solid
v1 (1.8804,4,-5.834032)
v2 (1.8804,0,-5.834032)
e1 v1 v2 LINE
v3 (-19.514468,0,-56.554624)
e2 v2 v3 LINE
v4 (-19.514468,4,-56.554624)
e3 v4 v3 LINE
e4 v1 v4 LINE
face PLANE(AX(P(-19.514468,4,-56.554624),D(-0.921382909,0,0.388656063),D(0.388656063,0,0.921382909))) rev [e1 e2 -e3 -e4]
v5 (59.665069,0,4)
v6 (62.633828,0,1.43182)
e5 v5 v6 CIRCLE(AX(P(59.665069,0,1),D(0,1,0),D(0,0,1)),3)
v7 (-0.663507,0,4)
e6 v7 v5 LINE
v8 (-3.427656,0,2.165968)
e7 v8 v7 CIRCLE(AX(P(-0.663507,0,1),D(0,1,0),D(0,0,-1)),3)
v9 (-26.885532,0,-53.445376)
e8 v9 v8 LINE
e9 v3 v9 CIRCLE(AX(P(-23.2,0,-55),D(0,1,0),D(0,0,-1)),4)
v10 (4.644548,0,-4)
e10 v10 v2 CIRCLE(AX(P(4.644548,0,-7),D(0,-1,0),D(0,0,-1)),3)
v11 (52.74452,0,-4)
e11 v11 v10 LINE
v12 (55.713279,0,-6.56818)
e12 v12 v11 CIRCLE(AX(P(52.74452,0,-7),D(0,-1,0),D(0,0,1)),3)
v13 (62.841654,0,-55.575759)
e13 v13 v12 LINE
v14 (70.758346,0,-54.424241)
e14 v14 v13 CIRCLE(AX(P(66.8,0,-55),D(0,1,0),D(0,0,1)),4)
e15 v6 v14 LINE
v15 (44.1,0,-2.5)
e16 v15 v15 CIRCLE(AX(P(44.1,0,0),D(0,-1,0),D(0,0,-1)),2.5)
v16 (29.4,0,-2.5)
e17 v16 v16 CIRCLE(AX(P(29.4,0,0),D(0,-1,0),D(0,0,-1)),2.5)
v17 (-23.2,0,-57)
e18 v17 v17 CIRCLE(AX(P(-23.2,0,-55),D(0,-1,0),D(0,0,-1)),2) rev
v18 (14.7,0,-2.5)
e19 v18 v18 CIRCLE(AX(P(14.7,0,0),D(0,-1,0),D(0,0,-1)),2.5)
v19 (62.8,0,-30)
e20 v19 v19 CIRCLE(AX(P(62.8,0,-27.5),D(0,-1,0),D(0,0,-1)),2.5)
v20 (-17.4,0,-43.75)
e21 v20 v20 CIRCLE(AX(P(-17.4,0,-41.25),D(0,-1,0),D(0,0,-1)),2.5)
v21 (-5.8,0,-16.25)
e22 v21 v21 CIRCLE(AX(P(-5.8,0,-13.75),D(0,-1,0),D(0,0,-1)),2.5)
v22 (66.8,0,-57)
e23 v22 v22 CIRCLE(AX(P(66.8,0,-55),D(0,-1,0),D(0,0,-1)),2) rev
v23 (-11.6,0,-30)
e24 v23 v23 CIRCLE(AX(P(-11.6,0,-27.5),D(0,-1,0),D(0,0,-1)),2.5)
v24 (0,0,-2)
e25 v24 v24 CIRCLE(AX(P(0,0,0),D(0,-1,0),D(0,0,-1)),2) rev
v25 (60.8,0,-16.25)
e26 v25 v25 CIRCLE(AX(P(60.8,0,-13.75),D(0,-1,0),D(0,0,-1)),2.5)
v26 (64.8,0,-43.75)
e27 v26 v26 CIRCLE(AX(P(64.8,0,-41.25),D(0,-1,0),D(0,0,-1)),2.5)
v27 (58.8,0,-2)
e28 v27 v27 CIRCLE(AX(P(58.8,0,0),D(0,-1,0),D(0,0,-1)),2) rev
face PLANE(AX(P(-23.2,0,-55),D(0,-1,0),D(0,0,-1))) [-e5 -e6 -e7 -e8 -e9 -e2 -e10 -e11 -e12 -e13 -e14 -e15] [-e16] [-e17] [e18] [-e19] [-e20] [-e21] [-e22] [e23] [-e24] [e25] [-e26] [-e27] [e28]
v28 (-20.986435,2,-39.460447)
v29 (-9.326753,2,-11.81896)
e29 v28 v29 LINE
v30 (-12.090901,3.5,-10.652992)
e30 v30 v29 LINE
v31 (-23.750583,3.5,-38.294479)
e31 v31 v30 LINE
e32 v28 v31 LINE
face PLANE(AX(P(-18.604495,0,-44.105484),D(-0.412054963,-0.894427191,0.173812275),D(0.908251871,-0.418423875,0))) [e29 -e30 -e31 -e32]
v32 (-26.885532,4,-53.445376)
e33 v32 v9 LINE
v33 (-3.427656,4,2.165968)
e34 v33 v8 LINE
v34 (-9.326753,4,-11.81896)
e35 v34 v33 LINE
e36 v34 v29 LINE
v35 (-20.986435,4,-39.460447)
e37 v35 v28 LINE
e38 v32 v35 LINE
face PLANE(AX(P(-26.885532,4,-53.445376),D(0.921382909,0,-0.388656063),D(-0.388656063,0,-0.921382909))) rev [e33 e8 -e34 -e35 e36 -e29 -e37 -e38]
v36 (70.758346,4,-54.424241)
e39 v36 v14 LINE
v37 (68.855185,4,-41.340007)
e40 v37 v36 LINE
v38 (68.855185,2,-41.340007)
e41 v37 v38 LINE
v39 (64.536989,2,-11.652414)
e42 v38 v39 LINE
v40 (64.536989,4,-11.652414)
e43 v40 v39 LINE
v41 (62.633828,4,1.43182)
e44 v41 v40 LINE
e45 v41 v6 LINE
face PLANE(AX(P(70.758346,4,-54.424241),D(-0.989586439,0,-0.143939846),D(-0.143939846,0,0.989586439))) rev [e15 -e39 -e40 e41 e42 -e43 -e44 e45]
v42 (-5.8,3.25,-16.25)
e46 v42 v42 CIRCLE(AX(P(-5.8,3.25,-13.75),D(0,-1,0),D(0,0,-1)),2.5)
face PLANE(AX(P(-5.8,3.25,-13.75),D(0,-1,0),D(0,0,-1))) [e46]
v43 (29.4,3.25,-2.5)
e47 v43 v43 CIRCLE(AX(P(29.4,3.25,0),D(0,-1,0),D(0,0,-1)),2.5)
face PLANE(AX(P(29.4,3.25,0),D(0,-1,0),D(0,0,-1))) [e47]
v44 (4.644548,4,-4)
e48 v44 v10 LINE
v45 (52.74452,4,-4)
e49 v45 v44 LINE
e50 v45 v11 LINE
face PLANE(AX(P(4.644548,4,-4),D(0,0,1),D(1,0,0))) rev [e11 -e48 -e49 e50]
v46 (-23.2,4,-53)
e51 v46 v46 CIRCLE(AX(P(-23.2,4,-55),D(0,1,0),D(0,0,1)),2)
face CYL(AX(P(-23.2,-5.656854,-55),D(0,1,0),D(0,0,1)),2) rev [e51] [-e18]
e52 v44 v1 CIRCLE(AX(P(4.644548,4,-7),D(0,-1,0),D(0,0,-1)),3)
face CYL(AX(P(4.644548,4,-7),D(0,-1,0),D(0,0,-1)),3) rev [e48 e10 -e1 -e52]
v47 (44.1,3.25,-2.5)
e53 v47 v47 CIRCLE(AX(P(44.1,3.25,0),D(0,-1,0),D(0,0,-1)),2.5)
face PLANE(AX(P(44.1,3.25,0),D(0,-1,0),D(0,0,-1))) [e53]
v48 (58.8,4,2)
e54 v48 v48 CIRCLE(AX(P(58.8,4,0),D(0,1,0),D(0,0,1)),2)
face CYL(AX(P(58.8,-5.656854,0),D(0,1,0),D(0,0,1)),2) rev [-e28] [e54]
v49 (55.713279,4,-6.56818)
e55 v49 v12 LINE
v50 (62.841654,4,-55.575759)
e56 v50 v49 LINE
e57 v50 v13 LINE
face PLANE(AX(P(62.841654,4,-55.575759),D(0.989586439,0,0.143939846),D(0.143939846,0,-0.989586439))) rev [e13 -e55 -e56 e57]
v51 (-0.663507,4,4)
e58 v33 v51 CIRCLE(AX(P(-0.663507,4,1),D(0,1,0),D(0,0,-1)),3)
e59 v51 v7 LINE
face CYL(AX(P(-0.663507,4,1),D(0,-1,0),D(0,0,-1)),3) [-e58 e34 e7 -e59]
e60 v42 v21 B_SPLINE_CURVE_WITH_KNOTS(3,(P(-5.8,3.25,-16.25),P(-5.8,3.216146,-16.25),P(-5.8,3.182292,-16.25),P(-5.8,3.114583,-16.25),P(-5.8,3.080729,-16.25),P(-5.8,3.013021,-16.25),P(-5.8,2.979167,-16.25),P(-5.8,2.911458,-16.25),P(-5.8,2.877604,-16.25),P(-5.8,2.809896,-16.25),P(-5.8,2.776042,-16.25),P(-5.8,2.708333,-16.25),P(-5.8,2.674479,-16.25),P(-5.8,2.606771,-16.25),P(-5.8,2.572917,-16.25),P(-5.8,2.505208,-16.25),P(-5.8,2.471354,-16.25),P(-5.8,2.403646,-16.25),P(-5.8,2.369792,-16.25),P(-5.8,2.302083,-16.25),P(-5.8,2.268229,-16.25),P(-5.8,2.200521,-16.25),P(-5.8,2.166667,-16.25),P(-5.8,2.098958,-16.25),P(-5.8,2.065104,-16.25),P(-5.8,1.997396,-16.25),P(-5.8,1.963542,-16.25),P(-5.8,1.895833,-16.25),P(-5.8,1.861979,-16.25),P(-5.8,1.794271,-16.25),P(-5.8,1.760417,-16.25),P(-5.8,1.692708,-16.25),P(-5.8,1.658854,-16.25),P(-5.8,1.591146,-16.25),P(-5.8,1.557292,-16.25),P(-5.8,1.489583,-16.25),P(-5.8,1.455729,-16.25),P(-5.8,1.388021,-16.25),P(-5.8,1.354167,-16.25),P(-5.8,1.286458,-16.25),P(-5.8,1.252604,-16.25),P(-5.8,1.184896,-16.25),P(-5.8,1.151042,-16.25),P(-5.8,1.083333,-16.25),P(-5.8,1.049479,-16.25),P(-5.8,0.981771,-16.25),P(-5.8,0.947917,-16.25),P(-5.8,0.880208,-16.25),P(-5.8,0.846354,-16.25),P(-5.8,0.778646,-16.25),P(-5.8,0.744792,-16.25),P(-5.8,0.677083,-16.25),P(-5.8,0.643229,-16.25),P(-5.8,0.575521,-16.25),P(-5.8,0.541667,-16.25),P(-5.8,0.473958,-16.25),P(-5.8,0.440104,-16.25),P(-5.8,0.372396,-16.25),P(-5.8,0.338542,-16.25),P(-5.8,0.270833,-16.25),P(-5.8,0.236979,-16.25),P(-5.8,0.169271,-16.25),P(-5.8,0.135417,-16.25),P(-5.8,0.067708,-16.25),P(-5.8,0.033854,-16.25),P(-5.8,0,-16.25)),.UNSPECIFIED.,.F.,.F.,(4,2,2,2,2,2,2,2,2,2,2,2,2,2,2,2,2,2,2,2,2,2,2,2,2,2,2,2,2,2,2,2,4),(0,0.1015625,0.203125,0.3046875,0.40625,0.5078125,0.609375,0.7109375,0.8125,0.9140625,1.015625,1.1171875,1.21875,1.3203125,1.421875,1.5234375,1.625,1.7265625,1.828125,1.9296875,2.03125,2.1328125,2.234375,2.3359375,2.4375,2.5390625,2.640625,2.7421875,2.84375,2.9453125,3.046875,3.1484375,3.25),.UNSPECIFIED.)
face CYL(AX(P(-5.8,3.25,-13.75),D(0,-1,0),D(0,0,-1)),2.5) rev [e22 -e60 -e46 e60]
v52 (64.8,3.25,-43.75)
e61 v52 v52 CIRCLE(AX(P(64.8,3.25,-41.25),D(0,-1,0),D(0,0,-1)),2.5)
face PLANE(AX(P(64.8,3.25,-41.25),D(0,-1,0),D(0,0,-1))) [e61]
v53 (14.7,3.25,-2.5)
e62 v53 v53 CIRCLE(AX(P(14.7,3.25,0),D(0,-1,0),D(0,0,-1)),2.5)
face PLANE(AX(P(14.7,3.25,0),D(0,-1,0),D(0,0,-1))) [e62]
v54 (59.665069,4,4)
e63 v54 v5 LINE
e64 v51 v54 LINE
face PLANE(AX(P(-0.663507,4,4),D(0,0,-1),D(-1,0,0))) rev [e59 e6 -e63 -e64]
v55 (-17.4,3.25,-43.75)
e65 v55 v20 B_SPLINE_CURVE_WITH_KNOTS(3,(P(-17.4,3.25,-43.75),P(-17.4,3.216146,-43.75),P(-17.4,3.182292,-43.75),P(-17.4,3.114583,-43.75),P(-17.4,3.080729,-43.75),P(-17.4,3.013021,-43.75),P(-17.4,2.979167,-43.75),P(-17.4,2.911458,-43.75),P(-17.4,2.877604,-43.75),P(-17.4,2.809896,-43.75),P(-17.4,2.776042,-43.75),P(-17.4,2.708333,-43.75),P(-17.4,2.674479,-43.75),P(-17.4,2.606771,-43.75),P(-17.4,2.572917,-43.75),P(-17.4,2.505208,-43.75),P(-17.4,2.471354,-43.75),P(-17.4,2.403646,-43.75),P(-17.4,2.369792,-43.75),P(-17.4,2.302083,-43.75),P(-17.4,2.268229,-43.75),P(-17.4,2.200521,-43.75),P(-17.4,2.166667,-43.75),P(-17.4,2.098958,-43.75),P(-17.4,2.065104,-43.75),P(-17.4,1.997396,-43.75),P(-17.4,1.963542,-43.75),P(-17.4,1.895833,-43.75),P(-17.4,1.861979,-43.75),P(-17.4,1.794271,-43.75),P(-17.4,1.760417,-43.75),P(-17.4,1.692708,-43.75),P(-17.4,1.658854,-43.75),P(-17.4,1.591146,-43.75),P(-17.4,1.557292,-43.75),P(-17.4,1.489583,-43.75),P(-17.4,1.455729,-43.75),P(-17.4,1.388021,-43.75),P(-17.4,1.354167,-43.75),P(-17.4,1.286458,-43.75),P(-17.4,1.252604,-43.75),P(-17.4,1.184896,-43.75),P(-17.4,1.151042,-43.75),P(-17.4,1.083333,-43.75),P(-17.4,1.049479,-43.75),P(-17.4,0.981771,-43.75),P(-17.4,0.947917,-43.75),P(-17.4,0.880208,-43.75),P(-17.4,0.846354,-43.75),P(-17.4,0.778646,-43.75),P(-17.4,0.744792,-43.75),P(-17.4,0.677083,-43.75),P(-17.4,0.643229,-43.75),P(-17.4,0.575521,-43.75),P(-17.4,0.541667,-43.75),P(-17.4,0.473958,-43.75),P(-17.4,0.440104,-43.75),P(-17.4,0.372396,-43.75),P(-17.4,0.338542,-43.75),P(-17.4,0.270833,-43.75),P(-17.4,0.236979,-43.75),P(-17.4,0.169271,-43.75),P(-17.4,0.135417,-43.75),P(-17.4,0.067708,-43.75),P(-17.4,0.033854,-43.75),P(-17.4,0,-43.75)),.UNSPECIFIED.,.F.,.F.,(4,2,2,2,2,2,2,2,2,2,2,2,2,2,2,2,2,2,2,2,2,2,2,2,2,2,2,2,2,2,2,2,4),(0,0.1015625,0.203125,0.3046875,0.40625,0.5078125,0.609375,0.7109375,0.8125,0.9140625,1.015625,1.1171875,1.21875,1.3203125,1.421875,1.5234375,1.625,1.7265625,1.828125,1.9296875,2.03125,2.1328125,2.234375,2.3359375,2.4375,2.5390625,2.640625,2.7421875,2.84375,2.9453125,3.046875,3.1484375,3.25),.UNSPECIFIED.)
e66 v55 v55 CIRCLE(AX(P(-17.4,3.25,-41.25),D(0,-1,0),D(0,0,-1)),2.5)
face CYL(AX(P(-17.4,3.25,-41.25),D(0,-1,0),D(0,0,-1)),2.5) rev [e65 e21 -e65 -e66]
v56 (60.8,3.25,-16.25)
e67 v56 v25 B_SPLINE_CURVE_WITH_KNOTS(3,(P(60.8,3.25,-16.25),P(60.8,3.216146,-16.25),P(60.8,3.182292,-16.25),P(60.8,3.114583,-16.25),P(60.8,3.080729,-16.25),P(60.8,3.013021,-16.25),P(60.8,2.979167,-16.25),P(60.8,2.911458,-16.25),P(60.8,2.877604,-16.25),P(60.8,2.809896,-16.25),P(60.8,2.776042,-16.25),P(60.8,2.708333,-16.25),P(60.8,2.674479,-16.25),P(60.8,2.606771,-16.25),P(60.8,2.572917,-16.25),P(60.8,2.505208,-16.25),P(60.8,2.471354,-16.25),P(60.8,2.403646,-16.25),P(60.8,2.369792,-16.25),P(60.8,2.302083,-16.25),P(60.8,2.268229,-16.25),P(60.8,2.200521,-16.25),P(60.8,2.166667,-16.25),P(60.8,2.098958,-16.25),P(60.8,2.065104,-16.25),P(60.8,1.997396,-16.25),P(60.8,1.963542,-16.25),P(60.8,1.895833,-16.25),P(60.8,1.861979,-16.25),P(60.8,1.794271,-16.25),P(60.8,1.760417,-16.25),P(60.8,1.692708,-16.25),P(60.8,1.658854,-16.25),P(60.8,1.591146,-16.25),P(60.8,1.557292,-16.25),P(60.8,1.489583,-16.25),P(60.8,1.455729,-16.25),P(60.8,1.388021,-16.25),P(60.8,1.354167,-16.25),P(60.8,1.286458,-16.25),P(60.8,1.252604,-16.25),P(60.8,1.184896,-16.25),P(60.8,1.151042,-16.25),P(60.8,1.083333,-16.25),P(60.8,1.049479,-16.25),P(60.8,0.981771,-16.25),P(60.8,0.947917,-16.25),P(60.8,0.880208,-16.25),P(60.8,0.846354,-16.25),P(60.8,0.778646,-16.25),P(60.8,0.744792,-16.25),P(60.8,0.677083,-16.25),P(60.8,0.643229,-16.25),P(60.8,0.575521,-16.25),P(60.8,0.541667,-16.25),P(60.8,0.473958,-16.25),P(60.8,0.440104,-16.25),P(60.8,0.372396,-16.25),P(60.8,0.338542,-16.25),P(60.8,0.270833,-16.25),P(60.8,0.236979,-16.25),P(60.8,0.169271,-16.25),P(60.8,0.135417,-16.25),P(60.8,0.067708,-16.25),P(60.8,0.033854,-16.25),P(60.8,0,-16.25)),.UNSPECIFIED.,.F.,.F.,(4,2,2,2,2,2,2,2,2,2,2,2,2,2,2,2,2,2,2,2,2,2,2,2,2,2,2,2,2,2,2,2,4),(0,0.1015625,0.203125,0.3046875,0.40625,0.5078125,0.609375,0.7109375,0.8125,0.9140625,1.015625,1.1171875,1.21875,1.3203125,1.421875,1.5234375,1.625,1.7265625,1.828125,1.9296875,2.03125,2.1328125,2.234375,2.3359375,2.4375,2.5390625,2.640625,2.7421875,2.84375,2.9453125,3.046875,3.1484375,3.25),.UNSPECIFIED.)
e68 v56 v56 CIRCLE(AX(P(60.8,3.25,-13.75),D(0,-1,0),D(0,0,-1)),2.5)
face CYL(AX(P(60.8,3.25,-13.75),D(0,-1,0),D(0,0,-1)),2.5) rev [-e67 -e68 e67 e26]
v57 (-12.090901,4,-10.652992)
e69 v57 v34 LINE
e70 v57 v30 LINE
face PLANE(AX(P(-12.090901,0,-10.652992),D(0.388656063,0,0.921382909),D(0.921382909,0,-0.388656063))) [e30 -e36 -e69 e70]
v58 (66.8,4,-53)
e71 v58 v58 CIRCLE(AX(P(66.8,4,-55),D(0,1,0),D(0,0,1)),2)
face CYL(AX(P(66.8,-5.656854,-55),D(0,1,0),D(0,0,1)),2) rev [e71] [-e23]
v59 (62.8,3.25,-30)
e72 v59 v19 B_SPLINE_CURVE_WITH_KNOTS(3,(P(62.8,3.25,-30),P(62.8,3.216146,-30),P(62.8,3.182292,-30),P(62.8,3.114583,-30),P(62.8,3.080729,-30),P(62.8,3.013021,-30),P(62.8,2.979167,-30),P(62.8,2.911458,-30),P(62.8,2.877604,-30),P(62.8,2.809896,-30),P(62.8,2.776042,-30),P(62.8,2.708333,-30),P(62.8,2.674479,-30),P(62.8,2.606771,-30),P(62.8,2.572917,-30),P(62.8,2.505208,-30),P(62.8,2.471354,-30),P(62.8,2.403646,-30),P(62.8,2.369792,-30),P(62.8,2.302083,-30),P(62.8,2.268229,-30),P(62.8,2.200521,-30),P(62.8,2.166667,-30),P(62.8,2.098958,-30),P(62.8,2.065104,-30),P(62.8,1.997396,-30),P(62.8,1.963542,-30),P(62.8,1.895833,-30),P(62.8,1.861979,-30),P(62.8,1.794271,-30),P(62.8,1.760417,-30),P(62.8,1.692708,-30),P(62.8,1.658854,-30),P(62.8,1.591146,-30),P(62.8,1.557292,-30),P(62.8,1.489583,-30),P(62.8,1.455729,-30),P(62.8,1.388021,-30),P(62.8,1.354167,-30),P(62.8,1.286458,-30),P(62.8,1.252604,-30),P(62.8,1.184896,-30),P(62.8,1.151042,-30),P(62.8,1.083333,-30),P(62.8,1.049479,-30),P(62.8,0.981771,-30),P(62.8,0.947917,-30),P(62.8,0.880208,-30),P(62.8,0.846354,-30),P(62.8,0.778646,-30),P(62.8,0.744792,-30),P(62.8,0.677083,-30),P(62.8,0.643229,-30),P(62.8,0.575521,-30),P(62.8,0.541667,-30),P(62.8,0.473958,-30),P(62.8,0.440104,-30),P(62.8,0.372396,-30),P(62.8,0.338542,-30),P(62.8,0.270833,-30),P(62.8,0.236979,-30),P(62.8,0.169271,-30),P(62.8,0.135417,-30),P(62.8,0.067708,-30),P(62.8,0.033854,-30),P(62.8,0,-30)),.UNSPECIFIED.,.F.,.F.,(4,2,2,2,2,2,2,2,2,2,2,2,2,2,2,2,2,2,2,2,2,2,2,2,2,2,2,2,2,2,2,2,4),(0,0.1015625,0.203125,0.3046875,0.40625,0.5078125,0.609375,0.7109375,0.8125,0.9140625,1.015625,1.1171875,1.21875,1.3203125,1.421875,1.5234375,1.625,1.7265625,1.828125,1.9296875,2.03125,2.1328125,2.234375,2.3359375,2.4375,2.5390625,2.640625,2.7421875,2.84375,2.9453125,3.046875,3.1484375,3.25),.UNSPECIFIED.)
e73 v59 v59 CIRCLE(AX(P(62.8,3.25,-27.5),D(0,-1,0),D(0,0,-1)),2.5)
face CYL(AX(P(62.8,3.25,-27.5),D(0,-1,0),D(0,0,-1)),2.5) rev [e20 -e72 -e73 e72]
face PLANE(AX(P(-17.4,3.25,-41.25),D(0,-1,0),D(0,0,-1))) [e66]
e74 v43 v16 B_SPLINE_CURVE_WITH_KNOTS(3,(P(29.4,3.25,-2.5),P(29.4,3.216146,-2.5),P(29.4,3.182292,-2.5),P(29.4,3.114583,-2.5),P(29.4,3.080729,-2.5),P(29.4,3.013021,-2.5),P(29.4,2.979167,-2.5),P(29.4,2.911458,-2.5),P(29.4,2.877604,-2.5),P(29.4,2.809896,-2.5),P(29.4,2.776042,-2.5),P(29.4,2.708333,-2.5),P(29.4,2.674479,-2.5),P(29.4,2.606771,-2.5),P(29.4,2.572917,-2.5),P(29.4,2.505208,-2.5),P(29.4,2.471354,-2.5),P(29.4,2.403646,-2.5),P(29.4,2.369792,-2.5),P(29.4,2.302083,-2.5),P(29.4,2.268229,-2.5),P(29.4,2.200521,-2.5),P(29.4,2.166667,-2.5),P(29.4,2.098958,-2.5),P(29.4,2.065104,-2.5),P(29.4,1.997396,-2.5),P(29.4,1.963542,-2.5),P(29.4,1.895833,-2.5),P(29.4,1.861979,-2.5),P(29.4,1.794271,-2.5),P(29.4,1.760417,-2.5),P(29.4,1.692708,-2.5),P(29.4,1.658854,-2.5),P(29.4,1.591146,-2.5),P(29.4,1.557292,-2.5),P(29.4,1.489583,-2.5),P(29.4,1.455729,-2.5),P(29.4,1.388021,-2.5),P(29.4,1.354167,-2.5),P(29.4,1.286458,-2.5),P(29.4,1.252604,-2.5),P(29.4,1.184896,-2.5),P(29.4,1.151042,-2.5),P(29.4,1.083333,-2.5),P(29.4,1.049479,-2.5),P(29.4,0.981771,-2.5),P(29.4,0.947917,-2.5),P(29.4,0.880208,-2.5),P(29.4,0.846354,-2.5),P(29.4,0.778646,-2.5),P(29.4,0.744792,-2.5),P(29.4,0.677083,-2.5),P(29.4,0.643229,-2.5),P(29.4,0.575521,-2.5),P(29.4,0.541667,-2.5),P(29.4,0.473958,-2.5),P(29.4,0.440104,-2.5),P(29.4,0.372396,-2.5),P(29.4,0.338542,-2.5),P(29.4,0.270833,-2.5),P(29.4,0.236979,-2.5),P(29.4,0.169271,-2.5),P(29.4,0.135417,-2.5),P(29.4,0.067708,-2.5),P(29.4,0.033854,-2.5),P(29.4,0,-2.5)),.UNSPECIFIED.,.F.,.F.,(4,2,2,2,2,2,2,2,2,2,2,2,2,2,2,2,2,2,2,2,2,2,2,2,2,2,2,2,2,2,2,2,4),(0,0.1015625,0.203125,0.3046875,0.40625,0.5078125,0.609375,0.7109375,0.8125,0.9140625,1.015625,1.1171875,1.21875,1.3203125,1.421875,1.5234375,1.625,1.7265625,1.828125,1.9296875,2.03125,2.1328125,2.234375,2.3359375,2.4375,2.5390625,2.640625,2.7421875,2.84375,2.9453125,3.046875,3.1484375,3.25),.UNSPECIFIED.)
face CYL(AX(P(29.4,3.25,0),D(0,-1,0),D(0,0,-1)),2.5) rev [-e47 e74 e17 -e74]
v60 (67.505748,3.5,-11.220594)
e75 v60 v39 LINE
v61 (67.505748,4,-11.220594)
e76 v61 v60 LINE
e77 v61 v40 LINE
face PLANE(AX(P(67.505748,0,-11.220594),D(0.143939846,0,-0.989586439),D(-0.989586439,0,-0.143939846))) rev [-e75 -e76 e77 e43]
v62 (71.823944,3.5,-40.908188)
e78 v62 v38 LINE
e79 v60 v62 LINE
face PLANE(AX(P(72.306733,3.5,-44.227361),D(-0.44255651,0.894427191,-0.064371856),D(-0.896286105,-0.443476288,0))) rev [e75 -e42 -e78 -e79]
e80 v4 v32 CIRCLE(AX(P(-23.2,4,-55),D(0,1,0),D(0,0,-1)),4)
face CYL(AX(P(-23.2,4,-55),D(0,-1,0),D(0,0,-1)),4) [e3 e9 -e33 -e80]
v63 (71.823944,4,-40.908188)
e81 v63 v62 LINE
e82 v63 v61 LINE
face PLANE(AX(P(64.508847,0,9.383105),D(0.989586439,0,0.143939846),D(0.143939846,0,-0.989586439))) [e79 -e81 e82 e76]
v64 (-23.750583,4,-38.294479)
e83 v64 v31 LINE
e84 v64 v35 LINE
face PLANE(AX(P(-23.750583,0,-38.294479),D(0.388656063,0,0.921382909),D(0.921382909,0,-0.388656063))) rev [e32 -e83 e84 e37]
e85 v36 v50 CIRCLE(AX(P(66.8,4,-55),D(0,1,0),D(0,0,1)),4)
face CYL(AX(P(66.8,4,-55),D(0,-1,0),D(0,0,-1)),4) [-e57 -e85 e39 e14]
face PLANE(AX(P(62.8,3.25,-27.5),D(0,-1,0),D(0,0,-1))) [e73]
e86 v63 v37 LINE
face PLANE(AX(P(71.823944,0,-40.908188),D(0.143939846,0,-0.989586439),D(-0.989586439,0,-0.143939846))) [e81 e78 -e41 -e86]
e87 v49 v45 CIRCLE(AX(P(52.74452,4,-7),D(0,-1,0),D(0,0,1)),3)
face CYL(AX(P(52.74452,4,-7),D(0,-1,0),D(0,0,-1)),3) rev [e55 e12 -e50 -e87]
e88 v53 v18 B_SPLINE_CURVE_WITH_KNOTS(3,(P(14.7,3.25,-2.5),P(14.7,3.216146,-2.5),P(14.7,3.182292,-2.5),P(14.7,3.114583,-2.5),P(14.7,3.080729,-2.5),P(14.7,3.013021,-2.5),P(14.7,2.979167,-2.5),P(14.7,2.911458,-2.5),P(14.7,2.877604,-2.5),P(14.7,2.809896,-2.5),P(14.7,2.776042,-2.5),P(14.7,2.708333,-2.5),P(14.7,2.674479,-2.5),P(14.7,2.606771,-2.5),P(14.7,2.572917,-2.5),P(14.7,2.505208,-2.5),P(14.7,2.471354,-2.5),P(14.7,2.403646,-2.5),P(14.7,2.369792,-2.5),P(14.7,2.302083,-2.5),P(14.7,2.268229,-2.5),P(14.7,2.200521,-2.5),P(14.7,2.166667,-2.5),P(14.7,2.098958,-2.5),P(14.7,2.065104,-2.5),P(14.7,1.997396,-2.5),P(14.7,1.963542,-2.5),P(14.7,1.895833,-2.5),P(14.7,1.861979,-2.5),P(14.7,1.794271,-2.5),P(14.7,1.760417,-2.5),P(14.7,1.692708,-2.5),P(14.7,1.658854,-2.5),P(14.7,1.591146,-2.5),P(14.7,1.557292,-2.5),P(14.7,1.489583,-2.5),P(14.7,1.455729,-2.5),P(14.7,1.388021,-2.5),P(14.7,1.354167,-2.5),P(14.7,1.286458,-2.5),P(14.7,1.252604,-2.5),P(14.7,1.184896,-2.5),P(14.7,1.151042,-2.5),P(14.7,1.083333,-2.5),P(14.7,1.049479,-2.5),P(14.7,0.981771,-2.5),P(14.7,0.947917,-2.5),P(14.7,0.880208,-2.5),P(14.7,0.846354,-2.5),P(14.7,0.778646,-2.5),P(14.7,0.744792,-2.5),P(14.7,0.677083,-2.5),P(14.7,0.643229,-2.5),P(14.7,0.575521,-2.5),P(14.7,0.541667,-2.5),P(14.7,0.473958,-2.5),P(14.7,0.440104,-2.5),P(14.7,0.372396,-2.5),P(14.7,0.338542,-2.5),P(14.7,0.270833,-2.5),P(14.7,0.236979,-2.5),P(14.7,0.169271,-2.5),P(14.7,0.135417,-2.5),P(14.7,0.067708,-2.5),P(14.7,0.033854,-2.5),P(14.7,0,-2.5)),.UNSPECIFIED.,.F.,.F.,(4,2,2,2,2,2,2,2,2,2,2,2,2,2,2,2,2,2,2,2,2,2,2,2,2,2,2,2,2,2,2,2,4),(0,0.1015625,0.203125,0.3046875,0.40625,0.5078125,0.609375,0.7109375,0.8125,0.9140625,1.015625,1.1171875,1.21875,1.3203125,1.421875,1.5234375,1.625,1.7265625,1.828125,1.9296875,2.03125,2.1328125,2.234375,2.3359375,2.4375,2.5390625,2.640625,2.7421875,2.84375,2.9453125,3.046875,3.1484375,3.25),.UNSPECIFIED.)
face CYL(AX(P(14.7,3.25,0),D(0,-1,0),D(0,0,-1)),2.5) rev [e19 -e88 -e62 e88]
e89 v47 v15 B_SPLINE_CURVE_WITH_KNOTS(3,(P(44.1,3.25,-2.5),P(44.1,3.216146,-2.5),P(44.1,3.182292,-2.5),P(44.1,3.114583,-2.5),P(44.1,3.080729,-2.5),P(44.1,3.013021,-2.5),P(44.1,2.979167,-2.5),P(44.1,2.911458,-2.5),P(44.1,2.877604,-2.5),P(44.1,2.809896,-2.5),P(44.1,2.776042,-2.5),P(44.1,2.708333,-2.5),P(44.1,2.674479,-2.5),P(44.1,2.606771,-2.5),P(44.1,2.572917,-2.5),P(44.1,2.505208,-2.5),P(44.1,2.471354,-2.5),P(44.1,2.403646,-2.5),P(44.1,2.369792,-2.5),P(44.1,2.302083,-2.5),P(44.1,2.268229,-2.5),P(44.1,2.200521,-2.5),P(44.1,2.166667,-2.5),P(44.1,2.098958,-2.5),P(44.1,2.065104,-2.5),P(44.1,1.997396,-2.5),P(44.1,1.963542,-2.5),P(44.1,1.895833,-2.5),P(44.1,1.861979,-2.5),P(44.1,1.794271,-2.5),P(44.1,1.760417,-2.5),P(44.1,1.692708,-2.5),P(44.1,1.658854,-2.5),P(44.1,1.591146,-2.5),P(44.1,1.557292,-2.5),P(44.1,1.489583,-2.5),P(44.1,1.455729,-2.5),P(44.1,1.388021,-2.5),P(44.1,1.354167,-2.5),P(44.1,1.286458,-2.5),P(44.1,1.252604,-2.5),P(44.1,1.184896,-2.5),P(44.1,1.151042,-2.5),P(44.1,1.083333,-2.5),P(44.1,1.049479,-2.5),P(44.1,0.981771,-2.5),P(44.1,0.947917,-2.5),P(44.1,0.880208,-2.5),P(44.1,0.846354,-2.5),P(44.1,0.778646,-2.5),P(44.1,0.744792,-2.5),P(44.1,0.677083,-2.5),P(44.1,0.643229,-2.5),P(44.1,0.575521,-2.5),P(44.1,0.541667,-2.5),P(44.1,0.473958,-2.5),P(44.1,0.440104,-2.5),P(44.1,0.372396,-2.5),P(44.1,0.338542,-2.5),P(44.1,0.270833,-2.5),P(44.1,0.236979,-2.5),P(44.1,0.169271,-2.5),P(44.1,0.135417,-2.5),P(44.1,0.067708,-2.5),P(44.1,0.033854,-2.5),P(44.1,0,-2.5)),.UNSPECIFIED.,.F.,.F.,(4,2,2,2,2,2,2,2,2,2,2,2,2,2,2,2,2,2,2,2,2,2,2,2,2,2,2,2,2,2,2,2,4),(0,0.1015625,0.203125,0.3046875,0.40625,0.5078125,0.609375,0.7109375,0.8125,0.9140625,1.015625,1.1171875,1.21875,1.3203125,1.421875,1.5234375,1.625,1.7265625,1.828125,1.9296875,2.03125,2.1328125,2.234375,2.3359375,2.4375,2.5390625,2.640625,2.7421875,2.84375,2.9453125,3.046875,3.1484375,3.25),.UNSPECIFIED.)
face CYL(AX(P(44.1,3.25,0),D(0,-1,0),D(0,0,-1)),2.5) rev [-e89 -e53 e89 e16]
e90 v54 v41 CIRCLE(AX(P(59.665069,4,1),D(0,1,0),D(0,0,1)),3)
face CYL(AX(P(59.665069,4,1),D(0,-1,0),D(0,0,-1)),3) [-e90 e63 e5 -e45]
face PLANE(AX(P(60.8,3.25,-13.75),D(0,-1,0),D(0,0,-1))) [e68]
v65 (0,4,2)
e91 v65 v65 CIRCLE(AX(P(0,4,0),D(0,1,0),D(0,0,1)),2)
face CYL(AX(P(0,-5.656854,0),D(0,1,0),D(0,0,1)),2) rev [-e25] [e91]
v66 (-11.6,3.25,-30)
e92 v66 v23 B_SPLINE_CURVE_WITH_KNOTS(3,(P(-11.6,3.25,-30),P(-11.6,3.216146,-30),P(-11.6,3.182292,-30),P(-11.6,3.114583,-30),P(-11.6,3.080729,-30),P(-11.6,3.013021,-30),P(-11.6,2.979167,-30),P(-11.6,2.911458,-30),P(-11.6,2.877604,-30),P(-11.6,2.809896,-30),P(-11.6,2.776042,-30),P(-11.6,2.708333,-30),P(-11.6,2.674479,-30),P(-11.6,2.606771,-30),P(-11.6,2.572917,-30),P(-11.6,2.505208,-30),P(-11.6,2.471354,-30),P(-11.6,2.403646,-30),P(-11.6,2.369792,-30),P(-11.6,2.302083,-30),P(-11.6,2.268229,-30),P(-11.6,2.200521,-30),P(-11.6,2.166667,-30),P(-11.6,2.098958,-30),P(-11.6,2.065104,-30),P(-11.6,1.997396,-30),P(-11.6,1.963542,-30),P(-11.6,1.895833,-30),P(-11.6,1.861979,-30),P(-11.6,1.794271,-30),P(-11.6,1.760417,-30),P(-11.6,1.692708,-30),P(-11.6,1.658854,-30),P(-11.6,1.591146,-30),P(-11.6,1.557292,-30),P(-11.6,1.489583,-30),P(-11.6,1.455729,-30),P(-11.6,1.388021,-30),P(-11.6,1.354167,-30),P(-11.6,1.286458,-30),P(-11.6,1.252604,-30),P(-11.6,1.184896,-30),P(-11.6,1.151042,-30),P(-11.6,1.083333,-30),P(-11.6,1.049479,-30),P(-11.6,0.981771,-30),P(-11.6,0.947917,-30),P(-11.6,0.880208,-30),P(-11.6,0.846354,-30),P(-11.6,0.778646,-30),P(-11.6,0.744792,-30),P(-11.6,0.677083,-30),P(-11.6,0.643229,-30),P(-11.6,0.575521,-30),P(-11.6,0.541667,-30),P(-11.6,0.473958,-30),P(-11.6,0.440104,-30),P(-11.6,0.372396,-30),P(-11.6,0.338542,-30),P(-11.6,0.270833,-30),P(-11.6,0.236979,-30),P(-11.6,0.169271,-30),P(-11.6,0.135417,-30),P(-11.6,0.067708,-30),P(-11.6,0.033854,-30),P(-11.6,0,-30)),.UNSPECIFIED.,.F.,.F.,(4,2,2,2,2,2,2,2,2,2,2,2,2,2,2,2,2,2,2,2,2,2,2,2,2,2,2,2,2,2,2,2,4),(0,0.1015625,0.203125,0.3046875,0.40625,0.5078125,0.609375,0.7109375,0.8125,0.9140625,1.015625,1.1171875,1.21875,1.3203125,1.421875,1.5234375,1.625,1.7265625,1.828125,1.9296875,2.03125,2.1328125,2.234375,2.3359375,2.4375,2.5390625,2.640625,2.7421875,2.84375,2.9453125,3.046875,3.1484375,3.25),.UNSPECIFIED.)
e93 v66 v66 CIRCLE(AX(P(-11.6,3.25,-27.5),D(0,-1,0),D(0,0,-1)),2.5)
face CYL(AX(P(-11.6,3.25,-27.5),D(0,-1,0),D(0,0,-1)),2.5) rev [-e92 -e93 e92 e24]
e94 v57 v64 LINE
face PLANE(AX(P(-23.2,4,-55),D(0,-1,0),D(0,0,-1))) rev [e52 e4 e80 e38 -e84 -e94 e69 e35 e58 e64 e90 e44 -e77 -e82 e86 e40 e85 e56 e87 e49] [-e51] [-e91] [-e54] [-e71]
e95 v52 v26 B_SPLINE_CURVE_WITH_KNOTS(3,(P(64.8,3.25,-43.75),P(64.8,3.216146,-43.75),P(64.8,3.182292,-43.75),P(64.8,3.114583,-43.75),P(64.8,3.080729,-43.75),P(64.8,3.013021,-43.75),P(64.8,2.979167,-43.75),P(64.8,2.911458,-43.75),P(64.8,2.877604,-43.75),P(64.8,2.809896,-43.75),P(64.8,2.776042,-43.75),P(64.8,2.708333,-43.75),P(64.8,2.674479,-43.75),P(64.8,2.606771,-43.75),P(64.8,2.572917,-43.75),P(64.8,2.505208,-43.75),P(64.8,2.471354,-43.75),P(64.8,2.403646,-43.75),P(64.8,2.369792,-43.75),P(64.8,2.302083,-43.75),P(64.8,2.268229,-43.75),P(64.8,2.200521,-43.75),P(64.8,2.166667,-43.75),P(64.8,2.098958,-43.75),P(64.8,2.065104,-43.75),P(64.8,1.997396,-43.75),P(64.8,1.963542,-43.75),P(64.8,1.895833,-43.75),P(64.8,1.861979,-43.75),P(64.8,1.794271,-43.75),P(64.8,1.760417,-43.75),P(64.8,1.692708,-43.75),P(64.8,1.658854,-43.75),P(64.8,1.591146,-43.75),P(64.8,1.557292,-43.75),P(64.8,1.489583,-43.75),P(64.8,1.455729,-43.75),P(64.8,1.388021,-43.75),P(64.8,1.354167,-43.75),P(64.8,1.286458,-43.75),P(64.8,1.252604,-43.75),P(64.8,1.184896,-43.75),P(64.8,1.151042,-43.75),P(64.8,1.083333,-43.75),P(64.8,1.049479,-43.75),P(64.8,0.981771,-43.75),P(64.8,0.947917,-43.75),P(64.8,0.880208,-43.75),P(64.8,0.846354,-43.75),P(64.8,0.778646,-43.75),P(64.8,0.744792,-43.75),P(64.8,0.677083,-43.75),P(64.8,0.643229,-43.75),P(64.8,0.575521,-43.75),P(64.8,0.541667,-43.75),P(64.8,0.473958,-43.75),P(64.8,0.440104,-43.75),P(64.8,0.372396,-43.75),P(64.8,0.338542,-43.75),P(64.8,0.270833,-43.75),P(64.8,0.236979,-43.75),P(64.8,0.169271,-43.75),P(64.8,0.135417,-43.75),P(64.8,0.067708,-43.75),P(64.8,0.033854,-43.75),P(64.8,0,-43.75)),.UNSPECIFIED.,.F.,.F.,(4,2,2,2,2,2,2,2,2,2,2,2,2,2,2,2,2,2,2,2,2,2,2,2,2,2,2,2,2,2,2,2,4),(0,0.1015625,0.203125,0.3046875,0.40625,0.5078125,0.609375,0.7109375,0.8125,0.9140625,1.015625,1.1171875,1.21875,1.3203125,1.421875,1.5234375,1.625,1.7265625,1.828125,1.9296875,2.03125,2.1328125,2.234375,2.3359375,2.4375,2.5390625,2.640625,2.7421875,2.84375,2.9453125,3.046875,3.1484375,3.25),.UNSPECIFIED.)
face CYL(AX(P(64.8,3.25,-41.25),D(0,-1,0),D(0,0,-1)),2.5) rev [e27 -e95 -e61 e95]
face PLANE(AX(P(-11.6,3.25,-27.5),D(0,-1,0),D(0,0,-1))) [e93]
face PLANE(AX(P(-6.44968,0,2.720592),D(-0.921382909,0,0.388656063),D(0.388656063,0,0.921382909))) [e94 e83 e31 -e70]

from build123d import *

# Parameters (mm, degrees)
BOSS_EXTRUDE1_DEPTH = 4
SKETCH5_R           = 2.5
CUT_EXTRUDE1_DEPTH  = 3.25
SKETCH6_W           = 30
SKETCH6_H           = 0.5
BOSS_EXTRUDE2_DEPTH = 3
BOSS_EXTRUDE3_DEPTH = 30
SKETCH8_W           = 30
SKETCH8_H           = 0.5
BOSS_EXTRUDE4_DEPTH = 3
BOSS_EXTRUDE5_DEPTH = 30
SKETCH10_R          = 2
CUT_EXTRUDE2_DEPTH  = 4


# Read off the part's stored shape, not the designer's step: M3x0.5 Tapped Hole1
with BuildPart() as part:
    # Sketch1 → Boss-Extrude1 (new body)
    with BuildSketch(Plane(origin=(0, 0, 0), x_dir=(1, 0, 0), z_dir=(0, 1, 0))):
        with BuildLine():
            Line((-26.885531635, 53.445375747), (-3.427655647, -2.16596819))
            ThreePointArc((-3.427655647, -2.16596819), (-2.322135184, -3.499790448), (-0.663506921, -4))
            Line((-0.663506921, -4), (59.665068599, -4))
            ThreePointArc((59.665068599, -4), (61.627788827, -3.268860795), (62.633827917, -1.431819537))
            Line((62.633827917, -1.431819537), (70.758345757, 54.424240617))
            ThreePointArc((70.758345757, 54.424240617), (67.375759383, 58.958345757), (62.841654243, 55.575759383))
            Line((62.841654243, 55.575759383), (55.713279127, 6.568180463))
            ThreePointArc((55.713279127, 6.568180463), (54.707240038, 4.731139205), (52.744519809, 4))
            Line((52.744519809, 4), (4.644548446, 4))
            ThreePointArc((4.644548446, 4), (2.985920183, 4.500209552), (1.88039972, 5.83403181))
            Line((1.88039972, 5.83403181), (-19.514468365, 56.554624253))
            ThreePointArc((-19.514468365, 56.554624253), (-24.754624253, 58.685531635), (-26.885531635, 53.445375747))
        make_face()
    extrude(amount=BOSS_EXTRUDE1_DEPTH)

    # M3x0.5 Tapped Hole1 outline → M3x0.5 Tapped Hole1 (revolve, cut)
    with BuildSketch(Plane(origin=(-23.2, 0, -55), x_dir=(1, 0, 0), z_dir=(0, 0, 1))):
        Polygon((0, 0), (1.25, 0), (1.25, 3.725), (1.525, 4), (0, 4), align=None)
    revolve(axis=Axis((-23.2, 0, -55), (0, 1, 0)), mode=Mode.SUBTRACT)

    # M3x0.5 Tapped Hole1 2 outline → M3x0.5 Tapped Hole1 2 (revolve, cut)
    with BuildSketch(Plane.XY):
        Polygon((0, 0), (1.25, 0), (1.25, 3.725), (1.525, 4), (0, 4), align=None)
    revolve(axis=Axis((0, 0, 0), (0, 1, 0)), mode=Mode.SUBTRACT)

    # M3x0.5 Tapped Hole1 3 outline → M3x0.5 Tapped Hole1 3 (revolve, cut)
    with BuildSketch(Plane(origin=(58.8, 0, 0), x_dir=(1, 0, 0), z_dir=(0, 0, 1))):
        Polygon((0, 0), (1.25, 0), (1.25, 3.725), (1.525, 4), (0, 4), align=None)
    revolve(axis=Axis((58.8, 0, 0), (0, 1, 0)), mode=Mode.SUBTRACT)

    # M3x0.5 Tapped Hole1 4 outline → M3x0.5 Tapped Hole1 4 (revolve, cut)
    with BuildSketch(Plane(origin=(66.8, 0, -55), x_dir=(1, 0, 0), z_dir=(0, 0, 1))):
        Polygon((0, 0), (1.25, 0), (1.25, 3.725), (1.525, 4), (0, 4), align=None)
    revolve(axis=Axis((66.8, 0, -55), (0, 1, 0)), mode=Mode.SUBTRACT)

    # Sketch5 → Cut-Extrude1 (cut)
    with BuildSketch(Plane.XZ):
        with Locations(Location((-17.4, -41.25, 0), (0, 0, 270))):
            Circle(SKETCH5_R)
        with Locations(Location((29.4, 0, 0), (0, 0, 270))):
            Circle(SKETCH5_R)
        with Locations(Location((60.8, -13.75, 0), (0, 0, 270))):
            Circle(SKETCH5_R)
        with Locations(Location((-5.8, -13.75, 0), (0, 0, 270))):
            Circle(SKETCH5_R)
        with Locations(Location((64.8, -41.25, 0), (0, 0, 270))):
            Circle(SKETCH5_R)
        with Locations(Location((-11.6, -27.5, 0), (0, 0, 270))):
            Circle(SKETCH5_R)
        with Locations(Location((14.7, 0, 0), (0, 0, 270))):
            Circle(SKETCH5_R)
        with Locations(Location((44.1, 0, 0), (0, 0, 270))):
            Circle(SKETCH5_R)
        with Locations(Location((62.8, -27.5, 0), (0, 0, 270))):
            Circle(SKETCH5_R)
    extrude(amount=-CUT_EXTRUDE1_DEPTH, mode=Mode.SUBTRACT)

    # Sketch6 → Boss-Extrude2 (add)
    with BuildSketch(Plane(origin=(-3.685531635, 0, 1.554624253), x_dir=(0.38865606330829405, 0, 0.921382908705007), z_dir=(-0.921382908705007, 0, 0.38865606330829405))):
        with Locations((-29.514686863, 3.75)):
            Rectangle(SKETCH6_W, SKETCH6_H)
    extrude(amount=BOSS_EXTRUDE2_DEPTH)

    # Sketch7 → Boss-Extrude3 (add)
    with BuildSketch(Plane(origin=(-5.641221056, 0, -13.373584401), x_dir=(0.9213829087050069, 0, -0.3886560633082941), z_dir=(0.3886560633082942, 0, 0.921382908705007))):
        Polygon((-4, 2), (-4, 3.5), (-7, 3.5), align=None)
    extrude(amount=-BOSS_EXTRUDE3_DEPTH)

    # Sketch8 → Boss-Extrude4 (add)
    with BuildSketch(Plane(origin=(61.540087421, 0, 8.951285443), x_dir=(0.14393984571411056, 0, -0.9895864392845114), z_dir=(0.9895864392845114, 0, 0.14393984571411056))):
        with Locations((35.820515092, 3.75)):
            Rectangle(SKETCH8_W, SKETCH8_H)
    extrude(amount=BOSS_EXTRUDE4_DEPTH)

    # Sketch9 → Boss-Extrude5 (add)
    with BuildSketch(Plane(origin=(2.99690173, 0, -20.603699394), x_dir=(0.9895864392845114, 0, 0.14393984571411056), z_dir=(-0.14393984571411056, 0, 0.9895864392845114))):
        Polygon((65.18768263, 3.5), (62.18768263, 3.5), (62.18768263, 2), align=None)
    extrude(amount=-BOSS_EXTRUDE5_DEPTH)

    # Sketch10 → Cut-Extrude2 (cut)
    with BuildSketch(Plane(origin=(0, 4, 0), x_dir=(1, 0, 0), z_dir=(0, 1, 0))):
        with Locations(Location((-23.2, 55, 0), (0, 0, 270))):
            Circle(SKETCH10_R)
        with Locations(Location((0, 0, 0), (0, 0, 270))):
            Circle(SKETCH10_R)
        with Locations(Location((58.8, 0, 0), (0, 0, 270))):
            Circle(SKETCH10_R)
        with Locations(Location((66.8, 55, 0), (0, 0, 270))):
            Circle(SKETCH10_R)
    extrude(amount=-CUT_EXTRUDE2_DEPTH, mode=Mode.SUBTRACT)


solid = part.part
